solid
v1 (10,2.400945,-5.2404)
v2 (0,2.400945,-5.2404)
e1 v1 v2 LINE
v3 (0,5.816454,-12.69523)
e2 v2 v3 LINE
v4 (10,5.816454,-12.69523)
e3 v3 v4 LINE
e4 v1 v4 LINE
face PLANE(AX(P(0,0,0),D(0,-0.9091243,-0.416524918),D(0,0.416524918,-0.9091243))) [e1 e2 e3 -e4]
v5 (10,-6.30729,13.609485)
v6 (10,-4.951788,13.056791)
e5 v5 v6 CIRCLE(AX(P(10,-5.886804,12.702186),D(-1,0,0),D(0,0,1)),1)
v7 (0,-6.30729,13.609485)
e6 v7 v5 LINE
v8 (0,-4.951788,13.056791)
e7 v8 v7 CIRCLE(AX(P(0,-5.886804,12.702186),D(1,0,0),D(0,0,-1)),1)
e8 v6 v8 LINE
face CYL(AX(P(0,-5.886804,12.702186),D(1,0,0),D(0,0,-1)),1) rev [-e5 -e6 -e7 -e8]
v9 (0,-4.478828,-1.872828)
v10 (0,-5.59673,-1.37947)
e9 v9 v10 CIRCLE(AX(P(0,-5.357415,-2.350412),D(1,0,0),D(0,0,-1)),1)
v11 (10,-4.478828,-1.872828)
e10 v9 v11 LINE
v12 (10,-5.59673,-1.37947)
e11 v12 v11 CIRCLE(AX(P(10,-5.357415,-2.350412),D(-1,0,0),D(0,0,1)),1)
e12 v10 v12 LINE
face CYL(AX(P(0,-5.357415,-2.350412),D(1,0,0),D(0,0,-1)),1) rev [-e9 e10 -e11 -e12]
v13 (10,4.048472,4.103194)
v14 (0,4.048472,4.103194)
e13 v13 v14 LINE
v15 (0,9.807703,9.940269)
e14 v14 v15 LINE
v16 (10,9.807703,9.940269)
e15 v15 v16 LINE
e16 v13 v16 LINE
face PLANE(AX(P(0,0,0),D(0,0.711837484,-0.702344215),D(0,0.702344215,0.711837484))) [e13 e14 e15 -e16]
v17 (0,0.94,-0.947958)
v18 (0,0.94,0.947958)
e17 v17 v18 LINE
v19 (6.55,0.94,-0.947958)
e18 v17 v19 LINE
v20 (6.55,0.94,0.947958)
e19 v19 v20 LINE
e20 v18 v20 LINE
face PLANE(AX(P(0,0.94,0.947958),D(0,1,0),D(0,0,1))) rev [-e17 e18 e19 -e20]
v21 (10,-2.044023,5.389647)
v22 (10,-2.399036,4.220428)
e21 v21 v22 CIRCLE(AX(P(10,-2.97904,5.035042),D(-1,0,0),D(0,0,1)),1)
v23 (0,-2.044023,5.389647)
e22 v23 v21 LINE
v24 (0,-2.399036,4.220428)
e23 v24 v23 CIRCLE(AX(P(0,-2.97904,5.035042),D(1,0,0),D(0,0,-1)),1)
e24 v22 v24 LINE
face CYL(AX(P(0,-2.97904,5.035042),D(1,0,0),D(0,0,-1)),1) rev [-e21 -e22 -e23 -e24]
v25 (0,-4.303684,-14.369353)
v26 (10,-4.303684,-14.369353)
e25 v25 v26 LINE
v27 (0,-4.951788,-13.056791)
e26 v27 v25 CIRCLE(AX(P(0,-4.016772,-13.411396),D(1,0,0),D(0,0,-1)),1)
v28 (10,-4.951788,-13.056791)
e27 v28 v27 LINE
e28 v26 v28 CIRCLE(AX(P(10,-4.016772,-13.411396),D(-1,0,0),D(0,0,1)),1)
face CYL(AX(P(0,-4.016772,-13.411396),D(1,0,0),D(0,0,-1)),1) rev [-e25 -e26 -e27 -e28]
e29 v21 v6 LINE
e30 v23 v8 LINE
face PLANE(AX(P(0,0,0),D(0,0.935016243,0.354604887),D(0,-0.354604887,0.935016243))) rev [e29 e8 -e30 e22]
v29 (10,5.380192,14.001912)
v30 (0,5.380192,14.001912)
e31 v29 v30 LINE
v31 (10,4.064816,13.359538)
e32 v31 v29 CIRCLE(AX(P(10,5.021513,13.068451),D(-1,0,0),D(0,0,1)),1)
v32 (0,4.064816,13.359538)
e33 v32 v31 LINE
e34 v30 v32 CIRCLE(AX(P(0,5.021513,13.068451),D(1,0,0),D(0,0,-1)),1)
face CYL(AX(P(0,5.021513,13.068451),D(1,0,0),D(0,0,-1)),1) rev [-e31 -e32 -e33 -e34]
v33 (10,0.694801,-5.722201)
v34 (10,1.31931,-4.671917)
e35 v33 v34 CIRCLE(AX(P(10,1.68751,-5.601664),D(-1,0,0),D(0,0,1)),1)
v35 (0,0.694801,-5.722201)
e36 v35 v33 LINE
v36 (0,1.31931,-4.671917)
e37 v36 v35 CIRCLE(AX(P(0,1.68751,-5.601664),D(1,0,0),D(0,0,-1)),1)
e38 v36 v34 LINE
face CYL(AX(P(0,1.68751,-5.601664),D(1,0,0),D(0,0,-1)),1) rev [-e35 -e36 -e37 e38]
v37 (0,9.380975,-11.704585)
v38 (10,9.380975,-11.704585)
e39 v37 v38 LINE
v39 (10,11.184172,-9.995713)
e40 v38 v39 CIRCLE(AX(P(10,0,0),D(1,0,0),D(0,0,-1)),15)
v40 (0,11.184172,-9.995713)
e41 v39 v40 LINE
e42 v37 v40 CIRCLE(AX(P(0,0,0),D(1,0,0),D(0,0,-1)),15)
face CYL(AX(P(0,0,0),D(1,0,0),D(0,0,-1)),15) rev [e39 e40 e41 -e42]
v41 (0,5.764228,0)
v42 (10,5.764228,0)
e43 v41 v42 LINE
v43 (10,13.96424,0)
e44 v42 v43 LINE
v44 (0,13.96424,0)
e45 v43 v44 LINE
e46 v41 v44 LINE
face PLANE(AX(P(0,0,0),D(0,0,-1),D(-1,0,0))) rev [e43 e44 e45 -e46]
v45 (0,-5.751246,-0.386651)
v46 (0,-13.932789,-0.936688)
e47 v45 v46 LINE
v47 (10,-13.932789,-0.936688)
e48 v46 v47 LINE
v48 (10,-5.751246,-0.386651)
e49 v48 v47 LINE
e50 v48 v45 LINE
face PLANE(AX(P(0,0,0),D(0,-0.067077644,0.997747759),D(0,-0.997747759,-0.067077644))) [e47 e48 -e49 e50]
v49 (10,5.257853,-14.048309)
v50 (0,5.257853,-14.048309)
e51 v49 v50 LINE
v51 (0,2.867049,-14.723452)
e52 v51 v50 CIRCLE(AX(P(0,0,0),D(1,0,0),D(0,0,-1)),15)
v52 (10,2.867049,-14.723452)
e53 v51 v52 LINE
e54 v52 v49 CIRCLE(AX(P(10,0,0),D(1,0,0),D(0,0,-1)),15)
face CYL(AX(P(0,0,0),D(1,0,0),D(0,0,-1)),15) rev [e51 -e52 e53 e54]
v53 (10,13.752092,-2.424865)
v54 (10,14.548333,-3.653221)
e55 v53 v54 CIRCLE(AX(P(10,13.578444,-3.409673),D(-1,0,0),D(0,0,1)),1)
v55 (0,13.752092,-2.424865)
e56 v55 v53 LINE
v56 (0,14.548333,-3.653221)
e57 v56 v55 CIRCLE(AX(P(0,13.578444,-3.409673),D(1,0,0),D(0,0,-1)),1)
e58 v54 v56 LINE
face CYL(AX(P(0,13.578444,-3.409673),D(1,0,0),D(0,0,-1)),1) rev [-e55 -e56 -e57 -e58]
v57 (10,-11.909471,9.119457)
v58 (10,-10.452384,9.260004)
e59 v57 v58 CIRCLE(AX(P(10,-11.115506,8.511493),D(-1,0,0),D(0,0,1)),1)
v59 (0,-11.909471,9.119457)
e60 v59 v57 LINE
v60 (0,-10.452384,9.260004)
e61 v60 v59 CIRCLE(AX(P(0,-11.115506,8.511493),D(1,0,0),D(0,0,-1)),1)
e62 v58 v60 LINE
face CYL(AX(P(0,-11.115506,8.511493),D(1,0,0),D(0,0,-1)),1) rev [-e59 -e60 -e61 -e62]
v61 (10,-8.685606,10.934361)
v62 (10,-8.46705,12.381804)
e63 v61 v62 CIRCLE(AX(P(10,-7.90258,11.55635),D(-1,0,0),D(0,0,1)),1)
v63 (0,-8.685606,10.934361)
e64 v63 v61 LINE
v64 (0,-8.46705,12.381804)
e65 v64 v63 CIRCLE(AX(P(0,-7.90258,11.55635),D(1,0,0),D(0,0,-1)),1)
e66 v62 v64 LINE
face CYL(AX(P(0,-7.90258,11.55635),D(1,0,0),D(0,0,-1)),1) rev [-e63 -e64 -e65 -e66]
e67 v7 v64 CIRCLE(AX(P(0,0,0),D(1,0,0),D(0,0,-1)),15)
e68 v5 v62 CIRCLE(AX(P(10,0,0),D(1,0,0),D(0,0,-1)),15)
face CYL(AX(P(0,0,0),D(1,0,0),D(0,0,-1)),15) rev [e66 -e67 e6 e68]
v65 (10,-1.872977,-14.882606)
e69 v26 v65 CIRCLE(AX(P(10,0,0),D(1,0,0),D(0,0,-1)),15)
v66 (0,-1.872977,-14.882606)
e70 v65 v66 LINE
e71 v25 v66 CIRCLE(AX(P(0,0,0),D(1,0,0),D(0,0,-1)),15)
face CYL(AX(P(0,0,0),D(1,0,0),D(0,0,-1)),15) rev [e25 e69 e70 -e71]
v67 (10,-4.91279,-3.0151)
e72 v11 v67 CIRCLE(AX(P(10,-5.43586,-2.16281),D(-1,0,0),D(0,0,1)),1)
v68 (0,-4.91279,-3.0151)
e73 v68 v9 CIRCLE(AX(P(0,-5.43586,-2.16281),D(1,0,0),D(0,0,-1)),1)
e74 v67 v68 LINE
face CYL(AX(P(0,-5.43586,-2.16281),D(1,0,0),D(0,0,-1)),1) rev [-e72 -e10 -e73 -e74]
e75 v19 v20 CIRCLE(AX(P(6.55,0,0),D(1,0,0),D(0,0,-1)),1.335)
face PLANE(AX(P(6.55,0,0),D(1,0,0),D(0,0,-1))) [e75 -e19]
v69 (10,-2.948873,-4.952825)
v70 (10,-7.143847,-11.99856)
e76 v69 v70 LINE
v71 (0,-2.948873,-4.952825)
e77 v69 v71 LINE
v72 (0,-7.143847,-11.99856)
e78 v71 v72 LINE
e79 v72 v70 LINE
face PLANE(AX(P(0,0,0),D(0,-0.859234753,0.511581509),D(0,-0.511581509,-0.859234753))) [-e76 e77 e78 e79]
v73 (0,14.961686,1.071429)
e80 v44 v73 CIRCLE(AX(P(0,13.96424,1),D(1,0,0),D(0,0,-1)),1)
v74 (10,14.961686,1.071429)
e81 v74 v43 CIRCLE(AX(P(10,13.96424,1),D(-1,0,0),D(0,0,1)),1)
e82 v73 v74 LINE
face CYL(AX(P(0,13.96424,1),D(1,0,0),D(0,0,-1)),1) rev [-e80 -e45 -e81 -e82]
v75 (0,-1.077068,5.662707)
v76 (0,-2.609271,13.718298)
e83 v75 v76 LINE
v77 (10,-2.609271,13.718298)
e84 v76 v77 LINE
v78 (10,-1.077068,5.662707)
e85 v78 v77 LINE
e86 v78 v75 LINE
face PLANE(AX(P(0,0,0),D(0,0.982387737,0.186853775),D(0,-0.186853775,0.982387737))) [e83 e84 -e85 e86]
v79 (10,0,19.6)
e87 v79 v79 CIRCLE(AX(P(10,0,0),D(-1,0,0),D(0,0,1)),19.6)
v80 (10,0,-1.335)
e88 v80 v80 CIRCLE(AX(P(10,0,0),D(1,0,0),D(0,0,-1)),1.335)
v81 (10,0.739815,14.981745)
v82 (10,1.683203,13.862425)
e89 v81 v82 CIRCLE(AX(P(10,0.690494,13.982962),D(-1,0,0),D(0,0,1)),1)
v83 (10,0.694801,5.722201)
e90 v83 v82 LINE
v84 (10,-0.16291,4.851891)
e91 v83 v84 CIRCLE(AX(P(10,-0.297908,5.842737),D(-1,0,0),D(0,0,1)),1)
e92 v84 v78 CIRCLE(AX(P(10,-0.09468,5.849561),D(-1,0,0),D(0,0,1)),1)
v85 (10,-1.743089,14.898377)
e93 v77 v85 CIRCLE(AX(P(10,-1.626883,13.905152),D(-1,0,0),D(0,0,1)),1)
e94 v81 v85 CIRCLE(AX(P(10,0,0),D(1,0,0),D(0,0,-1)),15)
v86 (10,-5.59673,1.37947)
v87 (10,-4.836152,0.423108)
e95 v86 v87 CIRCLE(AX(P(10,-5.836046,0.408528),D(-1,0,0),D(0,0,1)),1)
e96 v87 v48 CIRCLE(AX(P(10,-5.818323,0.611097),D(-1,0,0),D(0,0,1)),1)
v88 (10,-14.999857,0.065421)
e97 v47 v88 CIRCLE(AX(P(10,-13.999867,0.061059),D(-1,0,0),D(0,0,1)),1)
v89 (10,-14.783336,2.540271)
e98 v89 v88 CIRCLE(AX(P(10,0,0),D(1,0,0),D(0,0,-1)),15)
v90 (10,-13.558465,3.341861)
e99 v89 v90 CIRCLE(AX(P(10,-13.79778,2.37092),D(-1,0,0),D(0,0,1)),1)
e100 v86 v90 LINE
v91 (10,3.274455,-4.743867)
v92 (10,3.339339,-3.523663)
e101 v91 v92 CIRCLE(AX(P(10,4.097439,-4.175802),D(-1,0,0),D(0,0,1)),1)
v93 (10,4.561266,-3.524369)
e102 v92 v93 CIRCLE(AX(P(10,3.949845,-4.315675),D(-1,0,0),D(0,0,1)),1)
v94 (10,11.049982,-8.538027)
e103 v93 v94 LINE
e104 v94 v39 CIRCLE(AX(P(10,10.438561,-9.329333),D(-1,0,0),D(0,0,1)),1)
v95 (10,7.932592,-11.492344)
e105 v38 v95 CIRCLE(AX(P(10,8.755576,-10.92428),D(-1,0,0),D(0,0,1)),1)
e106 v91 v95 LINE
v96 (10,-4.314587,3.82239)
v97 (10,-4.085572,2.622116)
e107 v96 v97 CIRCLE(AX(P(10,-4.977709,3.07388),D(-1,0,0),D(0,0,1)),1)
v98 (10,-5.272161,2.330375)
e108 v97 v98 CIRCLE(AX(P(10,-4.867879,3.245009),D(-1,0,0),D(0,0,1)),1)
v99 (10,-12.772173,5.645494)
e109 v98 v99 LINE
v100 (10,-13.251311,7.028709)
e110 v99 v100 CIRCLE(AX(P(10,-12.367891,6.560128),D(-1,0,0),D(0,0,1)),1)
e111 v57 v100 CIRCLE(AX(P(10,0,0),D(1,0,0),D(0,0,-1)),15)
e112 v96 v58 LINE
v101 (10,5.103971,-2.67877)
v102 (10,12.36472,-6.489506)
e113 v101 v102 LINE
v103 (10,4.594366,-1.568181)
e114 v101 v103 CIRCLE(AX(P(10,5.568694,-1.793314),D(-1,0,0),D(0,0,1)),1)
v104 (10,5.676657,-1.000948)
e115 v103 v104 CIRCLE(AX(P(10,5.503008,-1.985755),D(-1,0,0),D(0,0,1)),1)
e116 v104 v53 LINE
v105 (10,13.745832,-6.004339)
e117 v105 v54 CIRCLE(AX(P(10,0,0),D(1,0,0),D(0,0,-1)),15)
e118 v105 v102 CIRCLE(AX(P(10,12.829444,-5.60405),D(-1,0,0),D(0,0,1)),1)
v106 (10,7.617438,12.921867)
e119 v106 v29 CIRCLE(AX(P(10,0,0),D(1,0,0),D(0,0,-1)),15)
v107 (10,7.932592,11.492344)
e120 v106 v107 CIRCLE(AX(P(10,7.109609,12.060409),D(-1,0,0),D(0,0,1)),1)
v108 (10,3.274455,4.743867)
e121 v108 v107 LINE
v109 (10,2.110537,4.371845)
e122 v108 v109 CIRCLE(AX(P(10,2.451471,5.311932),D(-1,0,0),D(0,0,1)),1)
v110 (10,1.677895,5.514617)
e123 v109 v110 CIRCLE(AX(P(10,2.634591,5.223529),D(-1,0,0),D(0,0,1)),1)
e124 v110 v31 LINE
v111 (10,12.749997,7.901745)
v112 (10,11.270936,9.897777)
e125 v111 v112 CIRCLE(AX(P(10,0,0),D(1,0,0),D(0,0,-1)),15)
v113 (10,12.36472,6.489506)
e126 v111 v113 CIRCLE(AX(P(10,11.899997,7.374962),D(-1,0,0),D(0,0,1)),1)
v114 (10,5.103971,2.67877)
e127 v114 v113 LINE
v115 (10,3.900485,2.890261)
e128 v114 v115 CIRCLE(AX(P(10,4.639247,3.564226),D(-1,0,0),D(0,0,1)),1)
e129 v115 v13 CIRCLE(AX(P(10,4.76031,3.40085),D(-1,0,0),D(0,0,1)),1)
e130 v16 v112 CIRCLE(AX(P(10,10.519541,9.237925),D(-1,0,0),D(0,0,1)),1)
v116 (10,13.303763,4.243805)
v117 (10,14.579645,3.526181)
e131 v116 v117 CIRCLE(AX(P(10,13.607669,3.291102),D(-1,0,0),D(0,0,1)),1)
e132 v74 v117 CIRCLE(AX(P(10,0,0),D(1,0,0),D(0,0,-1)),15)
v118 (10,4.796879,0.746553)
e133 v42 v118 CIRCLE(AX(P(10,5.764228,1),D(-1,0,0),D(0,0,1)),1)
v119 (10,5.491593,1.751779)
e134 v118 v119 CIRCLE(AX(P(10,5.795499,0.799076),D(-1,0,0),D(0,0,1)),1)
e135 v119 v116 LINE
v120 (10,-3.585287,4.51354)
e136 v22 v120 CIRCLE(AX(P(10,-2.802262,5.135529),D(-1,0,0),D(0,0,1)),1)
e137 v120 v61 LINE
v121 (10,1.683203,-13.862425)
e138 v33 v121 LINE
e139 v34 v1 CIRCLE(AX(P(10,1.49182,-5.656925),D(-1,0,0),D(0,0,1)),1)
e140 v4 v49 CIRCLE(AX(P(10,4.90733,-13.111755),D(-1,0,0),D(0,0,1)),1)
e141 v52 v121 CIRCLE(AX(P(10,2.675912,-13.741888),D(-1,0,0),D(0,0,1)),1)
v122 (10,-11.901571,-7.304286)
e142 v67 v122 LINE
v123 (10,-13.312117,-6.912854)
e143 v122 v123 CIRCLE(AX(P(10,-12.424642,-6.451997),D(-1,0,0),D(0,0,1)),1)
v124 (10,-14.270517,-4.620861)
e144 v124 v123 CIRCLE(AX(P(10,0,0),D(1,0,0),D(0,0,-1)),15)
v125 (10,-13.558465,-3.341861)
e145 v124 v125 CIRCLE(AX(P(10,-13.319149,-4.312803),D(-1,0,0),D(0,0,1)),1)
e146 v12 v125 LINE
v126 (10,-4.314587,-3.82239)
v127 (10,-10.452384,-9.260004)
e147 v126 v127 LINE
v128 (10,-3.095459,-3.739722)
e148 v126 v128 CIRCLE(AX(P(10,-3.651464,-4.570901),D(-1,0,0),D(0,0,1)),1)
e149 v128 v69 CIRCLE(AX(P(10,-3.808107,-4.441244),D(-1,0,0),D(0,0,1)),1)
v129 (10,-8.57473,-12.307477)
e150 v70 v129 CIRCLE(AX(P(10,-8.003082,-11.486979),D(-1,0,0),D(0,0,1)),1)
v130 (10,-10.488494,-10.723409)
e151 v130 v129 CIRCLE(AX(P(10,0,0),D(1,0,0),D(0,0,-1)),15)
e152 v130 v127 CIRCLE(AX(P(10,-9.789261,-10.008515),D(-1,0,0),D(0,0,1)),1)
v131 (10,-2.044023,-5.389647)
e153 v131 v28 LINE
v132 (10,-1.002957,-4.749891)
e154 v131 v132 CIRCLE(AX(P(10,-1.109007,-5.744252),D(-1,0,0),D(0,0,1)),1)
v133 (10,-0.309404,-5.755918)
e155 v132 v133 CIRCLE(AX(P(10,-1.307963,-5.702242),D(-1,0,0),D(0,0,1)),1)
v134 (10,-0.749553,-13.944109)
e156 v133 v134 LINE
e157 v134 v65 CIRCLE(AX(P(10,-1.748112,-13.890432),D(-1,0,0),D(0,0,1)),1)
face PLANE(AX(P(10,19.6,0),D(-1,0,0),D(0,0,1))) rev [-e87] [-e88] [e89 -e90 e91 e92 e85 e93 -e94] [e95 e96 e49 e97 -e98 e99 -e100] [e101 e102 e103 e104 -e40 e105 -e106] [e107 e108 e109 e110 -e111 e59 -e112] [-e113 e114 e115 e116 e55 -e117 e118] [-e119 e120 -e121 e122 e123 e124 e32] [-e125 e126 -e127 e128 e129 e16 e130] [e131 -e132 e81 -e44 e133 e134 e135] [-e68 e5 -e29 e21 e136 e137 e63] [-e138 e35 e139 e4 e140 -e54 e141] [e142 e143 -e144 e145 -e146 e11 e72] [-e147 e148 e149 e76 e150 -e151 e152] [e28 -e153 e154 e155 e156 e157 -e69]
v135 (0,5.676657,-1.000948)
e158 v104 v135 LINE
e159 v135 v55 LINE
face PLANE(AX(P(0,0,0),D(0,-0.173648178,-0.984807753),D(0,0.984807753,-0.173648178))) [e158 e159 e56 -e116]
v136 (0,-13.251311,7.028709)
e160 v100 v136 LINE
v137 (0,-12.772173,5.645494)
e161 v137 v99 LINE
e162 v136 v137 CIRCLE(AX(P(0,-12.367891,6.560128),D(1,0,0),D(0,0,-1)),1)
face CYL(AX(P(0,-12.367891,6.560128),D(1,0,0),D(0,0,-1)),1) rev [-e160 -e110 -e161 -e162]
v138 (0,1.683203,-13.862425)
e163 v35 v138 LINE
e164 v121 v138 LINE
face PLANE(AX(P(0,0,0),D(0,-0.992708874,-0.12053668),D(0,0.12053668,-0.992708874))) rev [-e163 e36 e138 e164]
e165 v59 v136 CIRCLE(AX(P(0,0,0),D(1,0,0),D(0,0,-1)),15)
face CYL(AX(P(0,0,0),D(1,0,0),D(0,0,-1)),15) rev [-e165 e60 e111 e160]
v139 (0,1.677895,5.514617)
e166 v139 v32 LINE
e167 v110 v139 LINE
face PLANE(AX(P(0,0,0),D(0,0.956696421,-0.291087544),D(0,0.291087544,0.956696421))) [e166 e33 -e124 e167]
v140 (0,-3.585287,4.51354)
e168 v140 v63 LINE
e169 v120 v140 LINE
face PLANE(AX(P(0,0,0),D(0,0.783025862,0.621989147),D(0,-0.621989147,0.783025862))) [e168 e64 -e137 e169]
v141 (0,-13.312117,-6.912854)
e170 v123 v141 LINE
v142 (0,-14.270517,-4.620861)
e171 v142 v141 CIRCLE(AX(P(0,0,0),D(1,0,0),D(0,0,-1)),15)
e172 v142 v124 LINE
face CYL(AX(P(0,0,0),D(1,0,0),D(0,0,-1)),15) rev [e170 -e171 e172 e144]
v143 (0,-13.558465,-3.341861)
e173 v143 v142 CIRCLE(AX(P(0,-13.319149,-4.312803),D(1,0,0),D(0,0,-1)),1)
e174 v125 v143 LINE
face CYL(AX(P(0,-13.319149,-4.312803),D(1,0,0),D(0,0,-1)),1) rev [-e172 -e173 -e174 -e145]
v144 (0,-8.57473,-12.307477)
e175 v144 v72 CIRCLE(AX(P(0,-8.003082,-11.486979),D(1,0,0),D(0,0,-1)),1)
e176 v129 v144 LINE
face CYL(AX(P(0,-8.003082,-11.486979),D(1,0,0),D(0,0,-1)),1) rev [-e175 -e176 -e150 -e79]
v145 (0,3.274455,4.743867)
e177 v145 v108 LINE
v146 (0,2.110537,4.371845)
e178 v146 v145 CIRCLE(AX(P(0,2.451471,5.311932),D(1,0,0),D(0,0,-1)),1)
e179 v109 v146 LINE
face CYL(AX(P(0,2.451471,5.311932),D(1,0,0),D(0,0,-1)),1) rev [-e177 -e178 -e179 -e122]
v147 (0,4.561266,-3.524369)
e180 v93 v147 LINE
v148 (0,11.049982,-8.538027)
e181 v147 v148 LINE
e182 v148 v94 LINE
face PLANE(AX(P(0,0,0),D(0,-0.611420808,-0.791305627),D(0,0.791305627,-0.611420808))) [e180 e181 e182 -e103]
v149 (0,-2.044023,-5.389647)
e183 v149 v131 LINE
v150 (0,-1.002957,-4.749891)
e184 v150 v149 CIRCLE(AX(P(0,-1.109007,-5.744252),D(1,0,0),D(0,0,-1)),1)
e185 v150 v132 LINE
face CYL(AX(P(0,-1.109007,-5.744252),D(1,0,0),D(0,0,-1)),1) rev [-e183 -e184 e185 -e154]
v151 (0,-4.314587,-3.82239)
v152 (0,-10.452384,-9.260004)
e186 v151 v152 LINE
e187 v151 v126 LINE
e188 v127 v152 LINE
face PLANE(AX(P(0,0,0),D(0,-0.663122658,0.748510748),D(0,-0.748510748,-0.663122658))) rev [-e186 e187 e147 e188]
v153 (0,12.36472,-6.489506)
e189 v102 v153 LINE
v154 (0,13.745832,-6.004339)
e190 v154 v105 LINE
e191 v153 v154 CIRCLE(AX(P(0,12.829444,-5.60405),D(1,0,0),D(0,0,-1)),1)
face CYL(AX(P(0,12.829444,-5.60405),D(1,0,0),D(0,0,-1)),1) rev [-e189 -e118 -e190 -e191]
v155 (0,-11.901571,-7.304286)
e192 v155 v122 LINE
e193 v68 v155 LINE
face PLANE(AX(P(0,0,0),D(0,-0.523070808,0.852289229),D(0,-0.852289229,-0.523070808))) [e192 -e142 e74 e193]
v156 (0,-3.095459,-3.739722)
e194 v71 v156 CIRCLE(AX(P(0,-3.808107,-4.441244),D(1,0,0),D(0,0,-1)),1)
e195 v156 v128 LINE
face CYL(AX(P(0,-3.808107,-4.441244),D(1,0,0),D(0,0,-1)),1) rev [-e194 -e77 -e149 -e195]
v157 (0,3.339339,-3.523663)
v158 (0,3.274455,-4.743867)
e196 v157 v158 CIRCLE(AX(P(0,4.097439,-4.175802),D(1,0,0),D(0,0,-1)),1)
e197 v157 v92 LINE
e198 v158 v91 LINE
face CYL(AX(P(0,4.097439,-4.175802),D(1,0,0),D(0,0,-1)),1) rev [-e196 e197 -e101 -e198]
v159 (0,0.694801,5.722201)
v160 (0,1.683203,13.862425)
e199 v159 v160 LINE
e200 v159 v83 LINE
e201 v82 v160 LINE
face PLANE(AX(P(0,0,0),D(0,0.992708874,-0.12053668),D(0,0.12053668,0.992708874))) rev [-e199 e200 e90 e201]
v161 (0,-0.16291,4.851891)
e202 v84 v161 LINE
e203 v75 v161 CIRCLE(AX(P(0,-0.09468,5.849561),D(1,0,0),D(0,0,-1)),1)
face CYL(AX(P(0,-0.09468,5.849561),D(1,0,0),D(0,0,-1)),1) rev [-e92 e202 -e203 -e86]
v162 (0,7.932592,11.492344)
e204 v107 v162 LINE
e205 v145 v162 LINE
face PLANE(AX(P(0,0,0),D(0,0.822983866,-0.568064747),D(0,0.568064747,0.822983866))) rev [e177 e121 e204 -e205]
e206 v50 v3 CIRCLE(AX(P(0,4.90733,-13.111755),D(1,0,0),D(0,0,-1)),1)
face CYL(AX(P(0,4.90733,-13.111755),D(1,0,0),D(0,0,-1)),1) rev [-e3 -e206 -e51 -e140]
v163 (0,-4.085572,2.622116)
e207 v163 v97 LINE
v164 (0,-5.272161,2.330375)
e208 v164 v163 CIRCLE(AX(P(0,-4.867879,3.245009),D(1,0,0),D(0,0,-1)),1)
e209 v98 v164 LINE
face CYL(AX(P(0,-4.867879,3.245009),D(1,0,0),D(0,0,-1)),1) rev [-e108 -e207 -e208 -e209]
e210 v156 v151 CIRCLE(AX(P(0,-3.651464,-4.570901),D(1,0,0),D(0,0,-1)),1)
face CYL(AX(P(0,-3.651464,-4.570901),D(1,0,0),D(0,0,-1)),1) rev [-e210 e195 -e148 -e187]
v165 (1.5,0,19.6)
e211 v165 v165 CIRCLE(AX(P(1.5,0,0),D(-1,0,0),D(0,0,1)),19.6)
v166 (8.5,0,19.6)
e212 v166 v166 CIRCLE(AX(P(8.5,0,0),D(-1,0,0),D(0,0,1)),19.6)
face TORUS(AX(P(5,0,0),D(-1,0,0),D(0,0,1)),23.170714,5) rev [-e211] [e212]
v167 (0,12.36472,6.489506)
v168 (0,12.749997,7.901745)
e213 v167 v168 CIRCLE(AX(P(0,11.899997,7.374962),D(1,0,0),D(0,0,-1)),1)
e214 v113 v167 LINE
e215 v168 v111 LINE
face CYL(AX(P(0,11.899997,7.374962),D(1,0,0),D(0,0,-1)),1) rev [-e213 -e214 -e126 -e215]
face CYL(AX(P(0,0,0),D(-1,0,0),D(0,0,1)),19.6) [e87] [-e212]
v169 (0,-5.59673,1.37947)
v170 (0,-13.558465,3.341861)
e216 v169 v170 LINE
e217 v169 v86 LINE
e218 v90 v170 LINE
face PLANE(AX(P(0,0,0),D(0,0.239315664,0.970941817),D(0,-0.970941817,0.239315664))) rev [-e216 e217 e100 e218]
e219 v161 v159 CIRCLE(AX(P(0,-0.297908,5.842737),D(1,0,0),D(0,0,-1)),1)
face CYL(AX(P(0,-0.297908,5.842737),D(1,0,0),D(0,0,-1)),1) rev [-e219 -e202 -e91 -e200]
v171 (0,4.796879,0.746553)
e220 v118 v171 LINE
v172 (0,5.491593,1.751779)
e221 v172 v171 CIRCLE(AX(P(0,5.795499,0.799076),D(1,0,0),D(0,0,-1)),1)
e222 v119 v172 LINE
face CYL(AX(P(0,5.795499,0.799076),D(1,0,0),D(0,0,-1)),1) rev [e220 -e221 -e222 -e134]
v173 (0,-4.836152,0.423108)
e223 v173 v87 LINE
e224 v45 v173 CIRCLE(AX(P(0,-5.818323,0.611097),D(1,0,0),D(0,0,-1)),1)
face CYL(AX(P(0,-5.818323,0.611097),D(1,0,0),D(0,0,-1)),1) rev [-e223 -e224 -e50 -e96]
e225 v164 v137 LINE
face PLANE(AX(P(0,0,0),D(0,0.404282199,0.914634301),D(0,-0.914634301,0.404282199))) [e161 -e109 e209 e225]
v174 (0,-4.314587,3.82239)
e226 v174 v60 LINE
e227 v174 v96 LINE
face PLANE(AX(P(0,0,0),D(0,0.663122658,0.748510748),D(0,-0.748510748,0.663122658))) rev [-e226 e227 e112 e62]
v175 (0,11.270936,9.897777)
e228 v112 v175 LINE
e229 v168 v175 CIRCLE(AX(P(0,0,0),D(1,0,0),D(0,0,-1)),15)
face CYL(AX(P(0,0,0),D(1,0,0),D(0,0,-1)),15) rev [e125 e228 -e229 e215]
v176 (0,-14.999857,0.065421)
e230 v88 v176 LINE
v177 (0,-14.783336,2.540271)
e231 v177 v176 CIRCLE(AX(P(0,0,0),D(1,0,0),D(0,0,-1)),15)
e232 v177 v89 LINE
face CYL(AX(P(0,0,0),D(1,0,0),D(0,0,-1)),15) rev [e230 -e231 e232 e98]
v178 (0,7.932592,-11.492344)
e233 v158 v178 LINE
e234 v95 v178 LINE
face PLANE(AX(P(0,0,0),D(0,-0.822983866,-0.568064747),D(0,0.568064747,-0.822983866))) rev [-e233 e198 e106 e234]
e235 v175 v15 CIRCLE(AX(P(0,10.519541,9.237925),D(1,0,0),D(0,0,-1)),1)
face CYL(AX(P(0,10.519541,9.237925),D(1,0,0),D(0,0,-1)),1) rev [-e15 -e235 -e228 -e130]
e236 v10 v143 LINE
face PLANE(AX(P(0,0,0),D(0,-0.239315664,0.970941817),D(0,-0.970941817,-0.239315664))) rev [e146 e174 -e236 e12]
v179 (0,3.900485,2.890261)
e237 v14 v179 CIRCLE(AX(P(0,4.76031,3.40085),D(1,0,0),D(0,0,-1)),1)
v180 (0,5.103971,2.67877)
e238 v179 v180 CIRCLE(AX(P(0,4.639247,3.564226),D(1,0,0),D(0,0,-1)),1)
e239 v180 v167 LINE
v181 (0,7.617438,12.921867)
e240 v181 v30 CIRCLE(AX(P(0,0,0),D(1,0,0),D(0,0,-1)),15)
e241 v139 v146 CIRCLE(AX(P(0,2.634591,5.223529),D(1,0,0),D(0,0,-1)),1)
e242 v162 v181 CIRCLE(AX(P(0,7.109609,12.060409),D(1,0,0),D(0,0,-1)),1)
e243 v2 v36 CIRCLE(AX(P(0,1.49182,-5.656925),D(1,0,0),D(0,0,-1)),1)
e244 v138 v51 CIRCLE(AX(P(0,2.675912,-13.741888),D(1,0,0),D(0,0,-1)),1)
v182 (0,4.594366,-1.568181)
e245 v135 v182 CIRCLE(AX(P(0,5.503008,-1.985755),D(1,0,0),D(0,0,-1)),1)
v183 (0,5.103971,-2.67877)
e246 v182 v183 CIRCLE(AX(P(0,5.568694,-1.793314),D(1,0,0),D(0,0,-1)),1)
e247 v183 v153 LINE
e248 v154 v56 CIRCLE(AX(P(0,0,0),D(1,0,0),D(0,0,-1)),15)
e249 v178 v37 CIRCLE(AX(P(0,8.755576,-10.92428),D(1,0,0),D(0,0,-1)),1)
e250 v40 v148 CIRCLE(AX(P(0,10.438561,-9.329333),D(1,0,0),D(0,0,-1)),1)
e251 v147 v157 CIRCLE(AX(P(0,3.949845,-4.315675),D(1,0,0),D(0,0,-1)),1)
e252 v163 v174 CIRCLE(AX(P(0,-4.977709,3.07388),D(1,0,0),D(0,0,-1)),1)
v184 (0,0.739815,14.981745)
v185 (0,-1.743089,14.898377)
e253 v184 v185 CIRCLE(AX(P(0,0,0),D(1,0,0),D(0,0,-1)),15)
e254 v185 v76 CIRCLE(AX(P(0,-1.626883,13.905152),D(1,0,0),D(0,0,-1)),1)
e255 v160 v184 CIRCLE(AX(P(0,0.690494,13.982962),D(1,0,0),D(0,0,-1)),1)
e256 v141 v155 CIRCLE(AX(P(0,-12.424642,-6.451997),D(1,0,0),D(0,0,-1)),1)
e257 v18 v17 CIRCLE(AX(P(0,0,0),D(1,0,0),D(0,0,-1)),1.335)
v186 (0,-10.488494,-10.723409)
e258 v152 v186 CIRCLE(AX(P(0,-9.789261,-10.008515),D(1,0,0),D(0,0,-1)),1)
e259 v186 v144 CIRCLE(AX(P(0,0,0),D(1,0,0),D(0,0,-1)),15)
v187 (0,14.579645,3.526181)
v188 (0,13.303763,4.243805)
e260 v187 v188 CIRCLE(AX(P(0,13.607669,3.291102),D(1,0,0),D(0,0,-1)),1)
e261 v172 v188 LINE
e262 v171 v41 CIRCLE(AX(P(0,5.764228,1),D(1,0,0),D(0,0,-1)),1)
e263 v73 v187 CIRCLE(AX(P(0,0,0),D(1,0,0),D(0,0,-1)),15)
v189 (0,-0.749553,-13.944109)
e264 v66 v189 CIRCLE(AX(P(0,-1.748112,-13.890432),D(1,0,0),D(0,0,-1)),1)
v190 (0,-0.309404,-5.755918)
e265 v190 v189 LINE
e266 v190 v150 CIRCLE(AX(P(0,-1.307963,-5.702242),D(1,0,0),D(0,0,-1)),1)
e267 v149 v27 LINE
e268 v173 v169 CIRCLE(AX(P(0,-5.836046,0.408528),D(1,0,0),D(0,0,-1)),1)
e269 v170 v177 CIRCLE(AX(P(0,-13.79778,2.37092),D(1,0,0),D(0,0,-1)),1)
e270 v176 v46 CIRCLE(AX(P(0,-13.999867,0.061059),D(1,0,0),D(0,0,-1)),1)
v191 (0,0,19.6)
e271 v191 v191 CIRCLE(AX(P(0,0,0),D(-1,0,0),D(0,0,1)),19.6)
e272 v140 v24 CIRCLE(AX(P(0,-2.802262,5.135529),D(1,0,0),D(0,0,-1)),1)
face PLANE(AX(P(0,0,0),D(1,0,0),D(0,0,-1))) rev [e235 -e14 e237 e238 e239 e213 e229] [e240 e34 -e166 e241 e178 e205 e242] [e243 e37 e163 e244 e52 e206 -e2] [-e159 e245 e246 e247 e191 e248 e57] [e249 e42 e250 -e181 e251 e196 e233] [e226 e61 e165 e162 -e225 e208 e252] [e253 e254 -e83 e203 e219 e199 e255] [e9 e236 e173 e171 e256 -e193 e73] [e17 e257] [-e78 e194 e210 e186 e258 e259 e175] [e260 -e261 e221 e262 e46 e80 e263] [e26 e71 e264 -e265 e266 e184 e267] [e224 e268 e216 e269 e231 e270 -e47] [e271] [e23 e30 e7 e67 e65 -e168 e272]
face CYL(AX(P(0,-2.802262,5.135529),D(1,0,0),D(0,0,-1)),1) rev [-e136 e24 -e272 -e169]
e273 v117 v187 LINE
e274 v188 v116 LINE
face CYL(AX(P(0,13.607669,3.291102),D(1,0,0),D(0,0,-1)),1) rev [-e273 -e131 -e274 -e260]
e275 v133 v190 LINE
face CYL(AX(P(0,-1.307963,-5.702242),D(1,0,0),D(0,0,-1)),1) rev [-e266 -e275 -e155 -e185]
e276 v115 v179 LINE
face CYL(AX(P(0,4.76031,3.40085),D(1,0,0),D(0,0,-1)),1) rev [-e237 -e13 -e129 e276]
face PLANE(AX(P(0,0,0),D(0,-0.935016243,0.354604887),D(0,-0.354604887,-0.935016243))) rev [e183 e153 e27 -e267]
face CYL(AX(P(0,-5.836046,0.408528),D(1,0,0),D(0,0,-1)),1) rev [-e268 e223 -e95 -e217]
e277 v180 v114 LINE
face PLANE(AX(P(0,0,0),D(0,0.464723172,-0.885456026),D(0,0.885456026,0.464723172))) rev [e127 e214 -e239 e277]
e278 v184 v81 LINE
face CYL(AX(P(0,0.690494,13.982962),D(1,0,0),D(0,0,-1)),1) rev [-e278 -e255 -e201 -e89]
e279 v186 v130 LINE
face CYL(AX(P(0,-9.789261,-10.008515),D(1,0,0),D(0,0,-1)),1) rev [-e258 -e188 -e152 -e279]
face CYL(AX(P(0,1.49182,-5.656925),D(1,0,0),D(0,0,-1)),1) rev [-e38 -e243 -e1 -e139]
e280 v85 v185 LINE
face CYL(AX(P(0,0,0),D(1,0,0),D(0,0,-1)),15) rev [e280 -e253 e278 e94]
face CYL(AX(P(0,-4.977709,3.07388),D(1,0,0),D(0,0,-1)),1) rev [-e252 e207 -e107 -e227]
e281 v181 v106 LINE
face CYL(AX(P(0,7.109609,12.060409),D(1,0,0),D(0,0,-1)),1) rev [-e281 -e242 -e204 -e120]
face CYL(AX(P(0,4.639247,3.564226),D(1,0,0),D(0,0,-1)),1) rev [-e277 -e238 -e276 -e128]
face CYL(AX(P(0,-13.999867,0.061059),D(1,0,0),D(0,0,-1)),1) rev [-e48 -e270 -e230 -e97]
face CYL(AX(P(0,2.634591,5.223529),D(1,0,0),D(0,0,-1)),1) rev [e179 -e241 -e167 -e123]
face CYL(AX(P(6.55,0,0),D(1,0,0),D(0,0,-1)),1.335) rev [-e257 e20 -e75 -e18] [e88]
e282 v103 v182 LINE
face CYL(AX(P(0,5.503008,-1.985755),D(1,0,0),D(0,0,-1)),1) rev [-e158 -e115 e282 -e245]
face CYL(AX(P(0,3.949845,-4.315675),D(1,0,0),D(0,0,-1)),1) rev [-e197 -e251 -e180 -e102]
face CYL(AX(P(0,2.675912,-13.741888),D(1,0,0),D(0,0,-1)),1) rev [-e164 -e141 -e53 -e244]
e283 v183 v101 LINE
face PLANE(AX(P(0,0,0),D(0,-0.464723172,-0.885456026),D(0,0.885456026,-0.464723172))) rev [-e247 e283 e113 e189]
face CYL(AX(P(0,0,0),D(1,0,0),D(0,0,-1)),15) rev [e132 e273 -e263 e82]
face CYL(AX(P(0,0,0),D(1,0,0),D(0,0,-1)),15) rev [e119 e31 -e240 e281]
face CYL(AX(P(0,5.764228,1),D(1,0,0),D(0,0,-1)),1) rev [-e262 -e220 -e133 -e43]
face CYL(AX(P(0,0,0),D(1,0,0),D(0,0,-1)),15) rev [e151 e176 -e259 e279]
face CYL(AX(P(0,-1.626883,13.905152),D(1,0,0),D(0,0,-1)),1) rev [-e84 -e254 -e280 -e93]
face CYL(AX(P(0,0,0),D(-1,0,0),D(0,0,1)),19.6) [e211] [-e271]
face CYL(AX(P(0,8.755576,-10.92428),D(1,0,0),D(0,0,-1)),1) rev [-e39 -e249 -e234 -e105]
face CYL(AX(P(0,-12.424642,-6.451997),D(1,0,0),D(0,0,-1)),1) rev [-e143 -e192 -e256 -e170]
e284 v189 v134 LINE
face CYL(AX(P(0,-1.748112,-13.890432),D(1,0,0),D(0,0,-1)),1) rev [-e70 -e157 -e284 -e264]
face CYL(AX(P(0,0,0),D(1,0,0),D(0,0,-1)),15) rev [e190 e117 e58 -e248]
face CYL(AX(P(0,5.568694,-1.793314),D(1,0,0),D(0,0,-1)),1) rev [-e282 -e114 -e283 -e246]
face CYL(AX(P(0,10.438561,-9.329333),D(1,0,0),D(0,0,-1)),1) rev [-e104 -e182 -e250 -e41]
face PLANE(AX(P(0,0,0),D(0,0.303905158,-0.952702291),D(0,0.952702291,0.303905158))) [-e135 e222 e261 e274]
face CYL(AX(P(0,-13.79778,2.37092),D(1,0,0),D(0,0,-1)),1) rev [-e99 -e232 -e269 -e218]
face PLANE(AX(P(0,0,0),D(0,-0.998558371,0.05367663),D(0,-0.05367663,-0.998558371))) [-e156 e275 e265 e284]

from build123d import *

# Parameters (mm, degrees)
CUT_EXTRUDE2_DEPTH = 30.467269979
FILLET1_R          = 1
SKETCH2_R          = 1.335
CUT_EXTRUDE3_DEPTH = 3.45
CUT_EXTRUDE5_DEPTH = 29.48196798


with BuildPart() as part:
    # Sketch1 → Revolve2 (revolve)
    with BuildSketch(Plane.XY, mode=Mode.PRIVATE) as revolve2_sk:
        with BuildLine():
            Line((0, 0), (10, 0))
            Line((10, 0), (10, 19.6))
            Line((10, 19.6), (8.5, 19.6))
            ThreePointArc((8.5, 19.6), (5, 18.170714214), (1.5, 19.6))
            Line((1.5, 19.6), (0, 19.6))
            Line((0, 19.6), (0, 0))
        make_face()
    revolve(revolve2_sk.sketch.rotate(Axis((0, 0, 0), (1, 0, 0)), 90), axis=Axis((0, 0, 0), (1, 0, 0)))

    # Sketch3 → Cut-Extrude2 (cut, through all)
    with BuildSketch(Plane(origin=(10, 0, 0), x_dir=(0, 0, -1), z_dir=(1, 0, 0))):
        with BuildLine():
            Line((2.604722665, 14.772116295), (0.84225046, 4.776639722))
            ThreePointArc((0.84225046, 4.776639722), (1.566792192, 4.590297931), (2.25405939, 4.294751347))
            Line((2.25405939, 4.294751347), (6.970847581, 13.281840385))
            ThreePointArc((6.970847581, 13.281840385), (4.845422268, 14.195840343), (2.604722665, 14.772116295))
        make_face()
        with BuildLine():
            Line((9.171312121, 11.869584406), (2.965590908, 3.838091119))
            ThreePointArc((2.965590908, 3.838091119), (3.520543403, 3.336382325), (3.991740938, 2.755299829))
            Line((3.991740938, 2.755299829), (12.344757988, 8.520971201))
            ThreePointArc((12.344757988, 8.520971201), (10.887544298, 10.318012365), (9.171312121, 11.869584406))
        make_face()
        with BuildLine():
            Line((13.636864497, 6.247873773), (4.409550218, 2.020282094))
            ThreePointArc((4.409550218, 2.020282094), (4.667780547, 1.318141736), (4.814962743, 0.584642325))
            Line((4.814962743, 0.584642325), (14.890633111, 1.808050204))
            ThreePointArc((14.890633111, 1.808050204), (14.435461139, 4.076452099), (13.636864497, 6.247873773))
        make_face()
        with BuildLine():
            Line((14.978375558, -0.805149446), (4.843334715, -0.260349211))
            ThreePointArc((4.843334715, -0.260349211), (4.74568542, -1.002069239), (4.53513461, -1.719949689))
            Line((4.53513461, -1.719949689), (14.02524364, -5.319073306))
            ThreePointArc((14.02524364, -5.319073306), (14.676387798, -3.098974216), (14.978375558, -0.805149446))
        make_face()
        with BuildLine():
            Line((12.888521288, -7.67372263), (4.167569596, -2.48133765))
            ThreePointArc((4.167569596, -2.48133765), (3.736410956, -3.092718228), (3.216361792, -3.630521958))
            Line((3.216361792, -3.630521958), (9.946839874, -11.227661223))
            ThreePointArc((9.946839874, -11.227661223), (11.555130883, -9.564462885), (12.888521288, -7.67372263))
        make_face()
        with BuildLine():
            Line((7.846062115, -12.784338438), (2.537064508, -4.133881536))
            ThreePointArc((2.537064508, -4.133881536), (1.87116977, -4.474862742), (1.160759249, -4.709385399))
            Line((1.160759249, -4.709385399), (3.589734964, -14.564127261))
            ThreePointArc((3.589734964, -14.564127261), (5.786732737, -13.838848371), (7.846062115, -12.784338438))
        make_face()
        with BuildLine():
            ThreePointArc((0.325348516, -4.839402981), (-0.42273386, -4.83187013), (-1.160759249, -4.709385399))
            Line((-1.160759249, -4.709385399), (-3.589734964, -14.564127261))
            ThreePointArc((-3.589734964, -14.564127261), (-1.307336141, -14.942920471), (1.006164666, -14.966216378))
            Line((1.006164666, -14.966216378), (0.325348516, -4.839402981))
        make_face()
        with BuildLine():
            ThreePointArc((-1.9609009, -4.436275524), (-2.619794257, -4.081954301), (-3.216361792, -3.630521958))
            Line((-3.216361792, -3.630521958), (-9.946839874, -11.227661223))
            ThreePointArc((-9.946839874, -11.227661223), (-8.101910065, -12.623749574), (-6.064232982, -13.719514508))
            Line((-6.064232982, -13.719514508), (-1.9609009, -4.436275524))
        make_face()
        with BuildLine():
            ThreePointArc((-3.797931552, -3.016850808), (-4.216691362, -2.396911935), (-4.53513461, -1.719949689))
            Line((-4.53513461, -1.719949689), (-14.02524364, -5.319073306))
            ThreePointArc((-14.02524364, -5.319073306), (-13.040434031, -7.412629781), (-11.745387936, -9.329837203))
            Line((-11.745387936, -9.329837203), (-3.797931552, -3.016850808))
        make_face()
        with BuildLine():
            ThreePointArc((-4.764901855, -0.906301928), (-4.847595293, -0.162765931), (-4.814962743, 0.584642325))
            Line((-4.814962743, 0.584642325), (-14.890633111, 1.808050204))
            ThreePointArc((-14.890633111, 1.808050204), (-14.991551715, -0.503365838), (-14.735816061, -2.802806631))
            Line((-14.735816061, -2.802806631), (-4.764901855, -0.906301928))
        make_face()
        with BuildLine():
            ThreePointArc((-4.640290566, 1.411869801), (-4.367973561, 2.108667787), (-3.991740938, 2.755299829))
            Line((-3.991740938, 2.755299829), (-12.344757988, 8.520971201))
            ThreePointArc((-12.344757988, 8.520971201), (-13.508285569, 6.521213153), (-14.350446312, 4.366313163))
            Line((-14.350446312, 4.366313163), (-4.640290566, 1.411869801))
        make_face()
        with BuildLine():
            ThreePointArc((-3.45264463, 3.406599173), (-2.887701727, 3.897031127), (-2.25405939, 4.294751347))
            Line((-2.25405939, 4.294751347), (-6.970847581, 13.281840385))
            ThreePointArc((-6.970847581, 13.281840385), (-8.930433992, 12.051860799), (-10.677562255, 10.53516323))
            Line((-10.677562255, 10.53516323), (-3.45264463, 3.406599173))
        make_face()
        with BuildLine():
            ThreePointArc((-1.474039418, 4.620917729), (-0.745892228, 4.7926316), (0, 4.850327089))
            Line((0, 4.850327089), (0, 15))
            ThreePointArc((0, 15), (-2.30672761, 14.821572377), (-4.558577364, 14.290534364))
            Line((-4.558577364, 14.290534364), (-1.474039418, 4.620917729))
        make_face()
    extrude(amount=-CUT_EXTRUDE2_DEPTH, mode=Mode.SUBTRACT)

    # Fillet1
    # the kernel refuses this fillet: 1 mm, written as the material it adds along each edge
    with BuildSketch(Plane(origin=(10, 14.290534364, 4.558577364), x_dir=(0, 0.26966420058726454, -0.9629544220375291), z_dir=(-1, 0, 0)), Plane(origin=(10, 10.53516323, 10.677562255), x_dir=(0, 0.6862830248559348, -0.7273345927388495), z_dir=(-1, 0, 0)), Plane(origin=(10, 4.366313163, 14.350446312), x_dir=(0, 0.9456826787369845, -0.3250911735757235), z_dir=(-1, 0, 0))) as fillet1_piece_1:
        with BuildLine():
            CenterArc((1.036376297, 0.999361225), FILLET1_R, 177.951978121, 94.096043758)
            Line((0.037015071, 1.035098339), (0, 0))
            ThreePointArc((0, 0), (0.536056705, -0.00958162), (1.07211341, 0))
        make_face()
    extrude(amount=10)
    with BuildSketch(Plane(origin=(10, 14.772116295, -2.604722665), x_dir=(0, -0.9848077530122082, 0.17364817766692997), z_dir=(-1, 0, 0)), Plane(origin=(10, 11.869584406, -9.171312121), x_dir=(0, -0.7913056270696629, 0.6114208080920107), z_dir=(-1, 0, 0)), Plane(origin=(10, -0.805149446, -14.978375558), x_dir=(0, 0.05367662970312148, 0.9985583705641419), z_dir=(-1, 0, 0)), Plane(origin=(10, 6.247873773, -13.636864497), x_dir=(0, -0.4165249182320387, 0.9091242998027241), z_dir=(-1, 0, 0)), Plane(origin=(10, -2.802806631, 14.735816061), x_dir=(0, 0.18685377538420386, -0.9823877374156649), z_dir=(-1, 0, 0)), Plane(origin=(10, -9.329837203, 11.745387936), x_dir=(0, 0.6219891468387043, -0.7830258624176221), z_dir=(-1, 0, 0)), Plane(origin=(10, -13.719514508, 6.064232982), x_dir=(0, 0.9146343005342535, -0.40428219882430744), z_dir=(-1, 0, 0)), Plane(origin=(10, -14.966216378, -1.006164666), x_dir=(0, 0.9977477585156255, 0.06707764439099849), z_dir=(-1, 0, 0)), Plane(origin=(10, -12.784338438, -7.846062115), x_dir=(0, 0.8522892291850337, 0.523070807649577), z_dir=(-1, 0, 0)), Plane(origin=(10, -7.67372263, -12.888521288), x_dir=(0, 0.5115815086468098, 0.859234752562217), z_dir=(-1, 0, 0))) as fillet1_piece_2:
        with BuildLine():
            CenterArc((1.035759956, -1), FILLET1_R, 90, 94.096043758)
            ThreePointArc((0.038314239, -1.071428571), (0.00958162, -0.536056705), (0, 0))
            Line((0, 0), (1.035759956, 0))
        make_face()
    extrude(amount=10)
    with BuildSketch(Plane(origin=(10, 1.808050204, 14.890633111), x_dir=(0, -0.9963823898655443, 0.08498313459638004), z_dir=(-1, 0, 0)), Plane(origin=(10, -5.319073306, 14.02524364), x_dir=(0, -0.9217464228410107, -0.38779315617968374), z_dir=(-1, 0, 0)), Plane(origin=(10, -14.564127261, 3.589734964), x_dir=(0, -0.20446413740132124, -0.9788740554927041), z_dir=(-1, 0, 0)), Plane(origin=(10, 1.808050204, -14.890633111), x_dir=(0, 0.9877671237764138, 0.15593623436030185), z_dir=(-1, 0, 0)), Plane(origin=(10, 8.520971201, -12.344757988), x_dir=(0, 0.8021571702215626, 0.5971129493338215), z_dir=(-1, 0, 0)), Plane(origin=(10, 15, 0), x_dir=(0, -0.03573711367703827, 0.9993612253364819), z_dir=(-1, 0, 0)), Plane(origin=(10, 13.281840385, 6.970847581), x_dir=(0, -0.49606996130055675, 0.8682825539507656), z_dir=(-1, 0, 0)), Plane(origin=(10, 8.520971201, 12.344757988), x_dir=(0, -0.8427591590813438, 0.5382908133941227), z_dir=(-1, 0, 0)), Plane(origin=(10, -11.227661223, -9.946839874), x_dir=(0, 0.6894486859841403, -0.7243345286500862), z_dir=(-1, 0, 0))) as fillet1_piece_3:
        with BuildLine():
            CenterArc((1.036376297, -0.999361225), FILLET1_R, 87.951978121, 94.096043758)
            Line((0.037015071, -1.035098339), (0, 0))
            ThreePointArc((0, 0), (0.536056705, 0.00958162), (1.07211341, 0))
        make_face()
    extrude(amount=10)
    with BuildSketch(Plane(origin=(10, -11.227661223, 9.946839874), x_dir=(0, 0.7485107481710997, -0.6631226582407966), z_dir=(-1, 0, 0)), Plane(origin=(10, -14.564127261, -3.589734964), x_dir=(0, 0.9709418174260528, 0.23931566428755488), z_dir=(-1, 0, 0)), Plane(origin=(10, -5.319073306, -14.02524364), x_dir=(0, 0.35460488704253845, 0.9350162426854137), z_dir=(-1, 0, 0)), Plane(origin=(10, 13.281840385, -6.970847581), x_dir=(0, -0.8854560256532109, 0.4647231720437667), z_dir=(-1, 0, 0))) as fillet1_piece_4:
        with BuildLine():
            CenterArc((1.035759956, 1), FILLET1_R, 175.903956242, 94.096043758)
            ThreePointArc((0.038314239, 1.071428571), (0.00958162, 0.536056705), (0, 0))
            Line((0, 0), (1.035759956, 0))
        make_face()
    extrude(amount=10)
    with BuildSketch(Plane(origin=(10, 4.620917729, 1.474039418), x_dir=(0, 0.22106072386394496, -0.9752600455082473), z_dir=(-1, 0, 0)), Plane(origin=(10, 3.406599173, 3.45264463), x_dir=(0, 0.6489654918969179, -0.7608178430655997), z_dir=(-1, 0, 0)), Plane(origin=(10, 1.411869801, 4.640290566), x_dir=(0, 0.9282000866181308, -0.3720814416254783), z_dir=(-1, 0, 0)), Plane(origin=(10, -3.016850808, 3.797931552), x_dir=(0, 0.8334947703768036, 0.5525273457074493), z_dir=(-1, 0, 0)), Plane(origin=(10, -4.436275524, 1.9609009), x_dir=(0, 0.4812507060426553, 0.8765830011661448), z_dir=(-1, 0, 0)), Plane(origin=(10, -4.133881536, -2.537064508), x_dir=(0, -0.44803210663360266, 0.8940174670695512), z_dir=(-1, 0, 0)), Plane(origin=(10, -2.48133765, -4.167569596), x_dir=(0, -0.8121833616638006, 0.5834022514839039), z_dir=(-1, 0, 0)), Plane(origin=(10, -0.260349211, -4.843334715), x_dir=(0, -0.990273196407553, 0.13913661084260984), z_dir=(-1, 0, 0)), Plane(origin=(10, 2.020282094, -4.409550218), x_dir=(0, -0.9415033759401247, -0.3370035505648989), z_dir=(-1, 0, 0)), Plane(origin=(10, 4.776639722, -0.84225046), x_dir=(0, -0.2574863919358113, -0.9662819246823765), z_dir=(-1, 0, 0)), Plane(origin=(10, 3.838091119, -2.965590908), x_dir=(0, -0.677046478390387, -0.7359402598711225), z_dir=(-1, 0, 0))) as fillet1_piece_5:
        with BuildLine():
            CenterArc((0.917918164, -0.996313974), FILLET1_R, 94.920965652, 80.158068696)
            Line((-0.07839581, -0.910532474), (0, 0))
            ThreePointArc((0, 0), (0.416068332, -0.017878433), (0.832136664, 0))
        make_face()
    extrude(amount=10)
    with BuildSketch(Plane(origin=(10, 4.850327089, 0), x_dir=(0, 1, 0), z_dir=(-1, 0, 0)), Plane(origin=(10, 4.294751347, 2.25405939), x_dir=(0, 0.8854560256532094, 0.46472317204376956), z_dir=(-1, 0, 0)), Plane(origin=(10, 2.755299829, 3.991740938), x_dir=(0, 0.5680647467311564, 0.822983865893656), z_dir=(-1, 0, 0)), Plane(origin=(10, 0.584642325, 4.814962743), x_dir=(0, 0.12053668025532241, 0.9927088740980541), z_dir=(-1, 0, 0)), Plane(origin=(10, -3.630521958, 3.216361792), x_dir=(0, -0.7485107481711016, 0.6631226582407946), z_dir=(-1, 0, 0)), Plane(origin=(10, -4.709385399, 1.160759249), x_dir=(0, -0.9709418174260522, 0.23931566428755724), z_dir=(-1, 0, 0)), Plane(origin=(10, -4.709385399, -1.160759249), x_dir=(0, -0.9709418174260516, -0.23931566428755952), z_dir=(-1, 0, 0)), Plane(origin=(10, -1.719949689, -4.53513461), x_dir=(0, -0.354604887042536, -0.9350162426854146), z_dir=(-1, 0, 0)), Plane(origin=(10, 4.294751347, -2.25405939), x_dir=(0, 0.8854560256532098, -0.4647231720437688), z_dir=(-1, 0, 0))) as fillet1_piece_6:
        with BuildLine():
            CenterArc((0.913901138, -1), FILLET1_R, 90, 80.158068696)
            ThreePointArc((-0.071381931, -0.829069386), (-0.017878433, -0.416068332), (0, 0))
            Line((0, 0), (0.913901138, 0))
        make_face()
    extrude(amount=10)
    with BuildSketch(Plane(origin=(10, -0.906301928, 4.764901855), x_dir=(0, -0.18685377538420458, 0.9823877374156648), z_dir=(-1, 0, 0)), Plane(origin=(10, -4.839402981, -0.325348516), x_dir=(0, -0.9977477585156251, -0.0670776443910017), z_dir=(-1, 0, 0))) as fillet1_piece_7:
        with BuildLine():
            CenterArc((0.913901138, 1), FILLET1_R, 189.841931304, 80.158068696)
            ThreePointArc((-0.071381931, 0.829069386), (-0.017878433, 0.416068332), (0, 0))
            Line((0, 0), (0.913901138, 0))
        make_face()
    extrude(amount=10)
    with BuildSketch(Plane(origin=(10, -1.719949689, 4.53513461), x_dir=(0, -0.9011512092511582, -0.4335048997014627), z_dir=(-1, 0, 0)), Plane(origin=(10, -3.630521958, -3.216361792), x_dir=(0, 0.7248867452699457, -0.6888680617737659), z_dir=(-1, 0, 0)), Plane(origin=(10, 0.584642325, -4.814962743), x_dir=(0, 0.9787099059298004, 0.2052484349145714), z_dir=(-1, 0, 0)), Plane(origin=(10, 2.755299829, -3.991740938), x_dir=(0, 0.7712208798416369, 0.6365676354451987), z_dir=(-1, 0, 0))) as fillet1_piece_8:
        with BuildLine():
            CenterArc((0.917918164, 0.996313974), FILLET1_R, 184.920965652, 80.158068696)
            Line((-0.07839581, 0.910532474), (0, 0))
            ThreePointArc((0, 0), (0.416068332, 0.017878433), (0.832136664, 0))
        make_face()
    extrude(amount=10)

    # Sketch2 → Cut-Extrude3 (cut)
    with BuildSketch(Plane(origin=(10, 0, 0), x_dir=(0, 0, -1), z_dir=(1, 0, 0))):
        Circle(SKETCH2_R)
    extrude(amount=-CUT_EXTRUDE3_DEPTH, mode=Mode.SUBTRACT)

    # Sketch5 → Cut-Extrude5 (cut, through all)
    with BuildSketch(Plane(origin=(6.55, 0, 0), x_dir=(0, 0, -1), z_dir=(1, 0, 0))):
        with BuildLine():
            Line((-0.947958332, 0.94), (0.947958332, 0.94))
            ThreePointArc((0.947958332, 0.94), (0, -1.335), (-0.947958332, 0.94))
        make_face()
    extrude(amount=-CUT_EXTRUDE5_DEPTH, mode=Mode.SUBTRACT)


solid = part.part
